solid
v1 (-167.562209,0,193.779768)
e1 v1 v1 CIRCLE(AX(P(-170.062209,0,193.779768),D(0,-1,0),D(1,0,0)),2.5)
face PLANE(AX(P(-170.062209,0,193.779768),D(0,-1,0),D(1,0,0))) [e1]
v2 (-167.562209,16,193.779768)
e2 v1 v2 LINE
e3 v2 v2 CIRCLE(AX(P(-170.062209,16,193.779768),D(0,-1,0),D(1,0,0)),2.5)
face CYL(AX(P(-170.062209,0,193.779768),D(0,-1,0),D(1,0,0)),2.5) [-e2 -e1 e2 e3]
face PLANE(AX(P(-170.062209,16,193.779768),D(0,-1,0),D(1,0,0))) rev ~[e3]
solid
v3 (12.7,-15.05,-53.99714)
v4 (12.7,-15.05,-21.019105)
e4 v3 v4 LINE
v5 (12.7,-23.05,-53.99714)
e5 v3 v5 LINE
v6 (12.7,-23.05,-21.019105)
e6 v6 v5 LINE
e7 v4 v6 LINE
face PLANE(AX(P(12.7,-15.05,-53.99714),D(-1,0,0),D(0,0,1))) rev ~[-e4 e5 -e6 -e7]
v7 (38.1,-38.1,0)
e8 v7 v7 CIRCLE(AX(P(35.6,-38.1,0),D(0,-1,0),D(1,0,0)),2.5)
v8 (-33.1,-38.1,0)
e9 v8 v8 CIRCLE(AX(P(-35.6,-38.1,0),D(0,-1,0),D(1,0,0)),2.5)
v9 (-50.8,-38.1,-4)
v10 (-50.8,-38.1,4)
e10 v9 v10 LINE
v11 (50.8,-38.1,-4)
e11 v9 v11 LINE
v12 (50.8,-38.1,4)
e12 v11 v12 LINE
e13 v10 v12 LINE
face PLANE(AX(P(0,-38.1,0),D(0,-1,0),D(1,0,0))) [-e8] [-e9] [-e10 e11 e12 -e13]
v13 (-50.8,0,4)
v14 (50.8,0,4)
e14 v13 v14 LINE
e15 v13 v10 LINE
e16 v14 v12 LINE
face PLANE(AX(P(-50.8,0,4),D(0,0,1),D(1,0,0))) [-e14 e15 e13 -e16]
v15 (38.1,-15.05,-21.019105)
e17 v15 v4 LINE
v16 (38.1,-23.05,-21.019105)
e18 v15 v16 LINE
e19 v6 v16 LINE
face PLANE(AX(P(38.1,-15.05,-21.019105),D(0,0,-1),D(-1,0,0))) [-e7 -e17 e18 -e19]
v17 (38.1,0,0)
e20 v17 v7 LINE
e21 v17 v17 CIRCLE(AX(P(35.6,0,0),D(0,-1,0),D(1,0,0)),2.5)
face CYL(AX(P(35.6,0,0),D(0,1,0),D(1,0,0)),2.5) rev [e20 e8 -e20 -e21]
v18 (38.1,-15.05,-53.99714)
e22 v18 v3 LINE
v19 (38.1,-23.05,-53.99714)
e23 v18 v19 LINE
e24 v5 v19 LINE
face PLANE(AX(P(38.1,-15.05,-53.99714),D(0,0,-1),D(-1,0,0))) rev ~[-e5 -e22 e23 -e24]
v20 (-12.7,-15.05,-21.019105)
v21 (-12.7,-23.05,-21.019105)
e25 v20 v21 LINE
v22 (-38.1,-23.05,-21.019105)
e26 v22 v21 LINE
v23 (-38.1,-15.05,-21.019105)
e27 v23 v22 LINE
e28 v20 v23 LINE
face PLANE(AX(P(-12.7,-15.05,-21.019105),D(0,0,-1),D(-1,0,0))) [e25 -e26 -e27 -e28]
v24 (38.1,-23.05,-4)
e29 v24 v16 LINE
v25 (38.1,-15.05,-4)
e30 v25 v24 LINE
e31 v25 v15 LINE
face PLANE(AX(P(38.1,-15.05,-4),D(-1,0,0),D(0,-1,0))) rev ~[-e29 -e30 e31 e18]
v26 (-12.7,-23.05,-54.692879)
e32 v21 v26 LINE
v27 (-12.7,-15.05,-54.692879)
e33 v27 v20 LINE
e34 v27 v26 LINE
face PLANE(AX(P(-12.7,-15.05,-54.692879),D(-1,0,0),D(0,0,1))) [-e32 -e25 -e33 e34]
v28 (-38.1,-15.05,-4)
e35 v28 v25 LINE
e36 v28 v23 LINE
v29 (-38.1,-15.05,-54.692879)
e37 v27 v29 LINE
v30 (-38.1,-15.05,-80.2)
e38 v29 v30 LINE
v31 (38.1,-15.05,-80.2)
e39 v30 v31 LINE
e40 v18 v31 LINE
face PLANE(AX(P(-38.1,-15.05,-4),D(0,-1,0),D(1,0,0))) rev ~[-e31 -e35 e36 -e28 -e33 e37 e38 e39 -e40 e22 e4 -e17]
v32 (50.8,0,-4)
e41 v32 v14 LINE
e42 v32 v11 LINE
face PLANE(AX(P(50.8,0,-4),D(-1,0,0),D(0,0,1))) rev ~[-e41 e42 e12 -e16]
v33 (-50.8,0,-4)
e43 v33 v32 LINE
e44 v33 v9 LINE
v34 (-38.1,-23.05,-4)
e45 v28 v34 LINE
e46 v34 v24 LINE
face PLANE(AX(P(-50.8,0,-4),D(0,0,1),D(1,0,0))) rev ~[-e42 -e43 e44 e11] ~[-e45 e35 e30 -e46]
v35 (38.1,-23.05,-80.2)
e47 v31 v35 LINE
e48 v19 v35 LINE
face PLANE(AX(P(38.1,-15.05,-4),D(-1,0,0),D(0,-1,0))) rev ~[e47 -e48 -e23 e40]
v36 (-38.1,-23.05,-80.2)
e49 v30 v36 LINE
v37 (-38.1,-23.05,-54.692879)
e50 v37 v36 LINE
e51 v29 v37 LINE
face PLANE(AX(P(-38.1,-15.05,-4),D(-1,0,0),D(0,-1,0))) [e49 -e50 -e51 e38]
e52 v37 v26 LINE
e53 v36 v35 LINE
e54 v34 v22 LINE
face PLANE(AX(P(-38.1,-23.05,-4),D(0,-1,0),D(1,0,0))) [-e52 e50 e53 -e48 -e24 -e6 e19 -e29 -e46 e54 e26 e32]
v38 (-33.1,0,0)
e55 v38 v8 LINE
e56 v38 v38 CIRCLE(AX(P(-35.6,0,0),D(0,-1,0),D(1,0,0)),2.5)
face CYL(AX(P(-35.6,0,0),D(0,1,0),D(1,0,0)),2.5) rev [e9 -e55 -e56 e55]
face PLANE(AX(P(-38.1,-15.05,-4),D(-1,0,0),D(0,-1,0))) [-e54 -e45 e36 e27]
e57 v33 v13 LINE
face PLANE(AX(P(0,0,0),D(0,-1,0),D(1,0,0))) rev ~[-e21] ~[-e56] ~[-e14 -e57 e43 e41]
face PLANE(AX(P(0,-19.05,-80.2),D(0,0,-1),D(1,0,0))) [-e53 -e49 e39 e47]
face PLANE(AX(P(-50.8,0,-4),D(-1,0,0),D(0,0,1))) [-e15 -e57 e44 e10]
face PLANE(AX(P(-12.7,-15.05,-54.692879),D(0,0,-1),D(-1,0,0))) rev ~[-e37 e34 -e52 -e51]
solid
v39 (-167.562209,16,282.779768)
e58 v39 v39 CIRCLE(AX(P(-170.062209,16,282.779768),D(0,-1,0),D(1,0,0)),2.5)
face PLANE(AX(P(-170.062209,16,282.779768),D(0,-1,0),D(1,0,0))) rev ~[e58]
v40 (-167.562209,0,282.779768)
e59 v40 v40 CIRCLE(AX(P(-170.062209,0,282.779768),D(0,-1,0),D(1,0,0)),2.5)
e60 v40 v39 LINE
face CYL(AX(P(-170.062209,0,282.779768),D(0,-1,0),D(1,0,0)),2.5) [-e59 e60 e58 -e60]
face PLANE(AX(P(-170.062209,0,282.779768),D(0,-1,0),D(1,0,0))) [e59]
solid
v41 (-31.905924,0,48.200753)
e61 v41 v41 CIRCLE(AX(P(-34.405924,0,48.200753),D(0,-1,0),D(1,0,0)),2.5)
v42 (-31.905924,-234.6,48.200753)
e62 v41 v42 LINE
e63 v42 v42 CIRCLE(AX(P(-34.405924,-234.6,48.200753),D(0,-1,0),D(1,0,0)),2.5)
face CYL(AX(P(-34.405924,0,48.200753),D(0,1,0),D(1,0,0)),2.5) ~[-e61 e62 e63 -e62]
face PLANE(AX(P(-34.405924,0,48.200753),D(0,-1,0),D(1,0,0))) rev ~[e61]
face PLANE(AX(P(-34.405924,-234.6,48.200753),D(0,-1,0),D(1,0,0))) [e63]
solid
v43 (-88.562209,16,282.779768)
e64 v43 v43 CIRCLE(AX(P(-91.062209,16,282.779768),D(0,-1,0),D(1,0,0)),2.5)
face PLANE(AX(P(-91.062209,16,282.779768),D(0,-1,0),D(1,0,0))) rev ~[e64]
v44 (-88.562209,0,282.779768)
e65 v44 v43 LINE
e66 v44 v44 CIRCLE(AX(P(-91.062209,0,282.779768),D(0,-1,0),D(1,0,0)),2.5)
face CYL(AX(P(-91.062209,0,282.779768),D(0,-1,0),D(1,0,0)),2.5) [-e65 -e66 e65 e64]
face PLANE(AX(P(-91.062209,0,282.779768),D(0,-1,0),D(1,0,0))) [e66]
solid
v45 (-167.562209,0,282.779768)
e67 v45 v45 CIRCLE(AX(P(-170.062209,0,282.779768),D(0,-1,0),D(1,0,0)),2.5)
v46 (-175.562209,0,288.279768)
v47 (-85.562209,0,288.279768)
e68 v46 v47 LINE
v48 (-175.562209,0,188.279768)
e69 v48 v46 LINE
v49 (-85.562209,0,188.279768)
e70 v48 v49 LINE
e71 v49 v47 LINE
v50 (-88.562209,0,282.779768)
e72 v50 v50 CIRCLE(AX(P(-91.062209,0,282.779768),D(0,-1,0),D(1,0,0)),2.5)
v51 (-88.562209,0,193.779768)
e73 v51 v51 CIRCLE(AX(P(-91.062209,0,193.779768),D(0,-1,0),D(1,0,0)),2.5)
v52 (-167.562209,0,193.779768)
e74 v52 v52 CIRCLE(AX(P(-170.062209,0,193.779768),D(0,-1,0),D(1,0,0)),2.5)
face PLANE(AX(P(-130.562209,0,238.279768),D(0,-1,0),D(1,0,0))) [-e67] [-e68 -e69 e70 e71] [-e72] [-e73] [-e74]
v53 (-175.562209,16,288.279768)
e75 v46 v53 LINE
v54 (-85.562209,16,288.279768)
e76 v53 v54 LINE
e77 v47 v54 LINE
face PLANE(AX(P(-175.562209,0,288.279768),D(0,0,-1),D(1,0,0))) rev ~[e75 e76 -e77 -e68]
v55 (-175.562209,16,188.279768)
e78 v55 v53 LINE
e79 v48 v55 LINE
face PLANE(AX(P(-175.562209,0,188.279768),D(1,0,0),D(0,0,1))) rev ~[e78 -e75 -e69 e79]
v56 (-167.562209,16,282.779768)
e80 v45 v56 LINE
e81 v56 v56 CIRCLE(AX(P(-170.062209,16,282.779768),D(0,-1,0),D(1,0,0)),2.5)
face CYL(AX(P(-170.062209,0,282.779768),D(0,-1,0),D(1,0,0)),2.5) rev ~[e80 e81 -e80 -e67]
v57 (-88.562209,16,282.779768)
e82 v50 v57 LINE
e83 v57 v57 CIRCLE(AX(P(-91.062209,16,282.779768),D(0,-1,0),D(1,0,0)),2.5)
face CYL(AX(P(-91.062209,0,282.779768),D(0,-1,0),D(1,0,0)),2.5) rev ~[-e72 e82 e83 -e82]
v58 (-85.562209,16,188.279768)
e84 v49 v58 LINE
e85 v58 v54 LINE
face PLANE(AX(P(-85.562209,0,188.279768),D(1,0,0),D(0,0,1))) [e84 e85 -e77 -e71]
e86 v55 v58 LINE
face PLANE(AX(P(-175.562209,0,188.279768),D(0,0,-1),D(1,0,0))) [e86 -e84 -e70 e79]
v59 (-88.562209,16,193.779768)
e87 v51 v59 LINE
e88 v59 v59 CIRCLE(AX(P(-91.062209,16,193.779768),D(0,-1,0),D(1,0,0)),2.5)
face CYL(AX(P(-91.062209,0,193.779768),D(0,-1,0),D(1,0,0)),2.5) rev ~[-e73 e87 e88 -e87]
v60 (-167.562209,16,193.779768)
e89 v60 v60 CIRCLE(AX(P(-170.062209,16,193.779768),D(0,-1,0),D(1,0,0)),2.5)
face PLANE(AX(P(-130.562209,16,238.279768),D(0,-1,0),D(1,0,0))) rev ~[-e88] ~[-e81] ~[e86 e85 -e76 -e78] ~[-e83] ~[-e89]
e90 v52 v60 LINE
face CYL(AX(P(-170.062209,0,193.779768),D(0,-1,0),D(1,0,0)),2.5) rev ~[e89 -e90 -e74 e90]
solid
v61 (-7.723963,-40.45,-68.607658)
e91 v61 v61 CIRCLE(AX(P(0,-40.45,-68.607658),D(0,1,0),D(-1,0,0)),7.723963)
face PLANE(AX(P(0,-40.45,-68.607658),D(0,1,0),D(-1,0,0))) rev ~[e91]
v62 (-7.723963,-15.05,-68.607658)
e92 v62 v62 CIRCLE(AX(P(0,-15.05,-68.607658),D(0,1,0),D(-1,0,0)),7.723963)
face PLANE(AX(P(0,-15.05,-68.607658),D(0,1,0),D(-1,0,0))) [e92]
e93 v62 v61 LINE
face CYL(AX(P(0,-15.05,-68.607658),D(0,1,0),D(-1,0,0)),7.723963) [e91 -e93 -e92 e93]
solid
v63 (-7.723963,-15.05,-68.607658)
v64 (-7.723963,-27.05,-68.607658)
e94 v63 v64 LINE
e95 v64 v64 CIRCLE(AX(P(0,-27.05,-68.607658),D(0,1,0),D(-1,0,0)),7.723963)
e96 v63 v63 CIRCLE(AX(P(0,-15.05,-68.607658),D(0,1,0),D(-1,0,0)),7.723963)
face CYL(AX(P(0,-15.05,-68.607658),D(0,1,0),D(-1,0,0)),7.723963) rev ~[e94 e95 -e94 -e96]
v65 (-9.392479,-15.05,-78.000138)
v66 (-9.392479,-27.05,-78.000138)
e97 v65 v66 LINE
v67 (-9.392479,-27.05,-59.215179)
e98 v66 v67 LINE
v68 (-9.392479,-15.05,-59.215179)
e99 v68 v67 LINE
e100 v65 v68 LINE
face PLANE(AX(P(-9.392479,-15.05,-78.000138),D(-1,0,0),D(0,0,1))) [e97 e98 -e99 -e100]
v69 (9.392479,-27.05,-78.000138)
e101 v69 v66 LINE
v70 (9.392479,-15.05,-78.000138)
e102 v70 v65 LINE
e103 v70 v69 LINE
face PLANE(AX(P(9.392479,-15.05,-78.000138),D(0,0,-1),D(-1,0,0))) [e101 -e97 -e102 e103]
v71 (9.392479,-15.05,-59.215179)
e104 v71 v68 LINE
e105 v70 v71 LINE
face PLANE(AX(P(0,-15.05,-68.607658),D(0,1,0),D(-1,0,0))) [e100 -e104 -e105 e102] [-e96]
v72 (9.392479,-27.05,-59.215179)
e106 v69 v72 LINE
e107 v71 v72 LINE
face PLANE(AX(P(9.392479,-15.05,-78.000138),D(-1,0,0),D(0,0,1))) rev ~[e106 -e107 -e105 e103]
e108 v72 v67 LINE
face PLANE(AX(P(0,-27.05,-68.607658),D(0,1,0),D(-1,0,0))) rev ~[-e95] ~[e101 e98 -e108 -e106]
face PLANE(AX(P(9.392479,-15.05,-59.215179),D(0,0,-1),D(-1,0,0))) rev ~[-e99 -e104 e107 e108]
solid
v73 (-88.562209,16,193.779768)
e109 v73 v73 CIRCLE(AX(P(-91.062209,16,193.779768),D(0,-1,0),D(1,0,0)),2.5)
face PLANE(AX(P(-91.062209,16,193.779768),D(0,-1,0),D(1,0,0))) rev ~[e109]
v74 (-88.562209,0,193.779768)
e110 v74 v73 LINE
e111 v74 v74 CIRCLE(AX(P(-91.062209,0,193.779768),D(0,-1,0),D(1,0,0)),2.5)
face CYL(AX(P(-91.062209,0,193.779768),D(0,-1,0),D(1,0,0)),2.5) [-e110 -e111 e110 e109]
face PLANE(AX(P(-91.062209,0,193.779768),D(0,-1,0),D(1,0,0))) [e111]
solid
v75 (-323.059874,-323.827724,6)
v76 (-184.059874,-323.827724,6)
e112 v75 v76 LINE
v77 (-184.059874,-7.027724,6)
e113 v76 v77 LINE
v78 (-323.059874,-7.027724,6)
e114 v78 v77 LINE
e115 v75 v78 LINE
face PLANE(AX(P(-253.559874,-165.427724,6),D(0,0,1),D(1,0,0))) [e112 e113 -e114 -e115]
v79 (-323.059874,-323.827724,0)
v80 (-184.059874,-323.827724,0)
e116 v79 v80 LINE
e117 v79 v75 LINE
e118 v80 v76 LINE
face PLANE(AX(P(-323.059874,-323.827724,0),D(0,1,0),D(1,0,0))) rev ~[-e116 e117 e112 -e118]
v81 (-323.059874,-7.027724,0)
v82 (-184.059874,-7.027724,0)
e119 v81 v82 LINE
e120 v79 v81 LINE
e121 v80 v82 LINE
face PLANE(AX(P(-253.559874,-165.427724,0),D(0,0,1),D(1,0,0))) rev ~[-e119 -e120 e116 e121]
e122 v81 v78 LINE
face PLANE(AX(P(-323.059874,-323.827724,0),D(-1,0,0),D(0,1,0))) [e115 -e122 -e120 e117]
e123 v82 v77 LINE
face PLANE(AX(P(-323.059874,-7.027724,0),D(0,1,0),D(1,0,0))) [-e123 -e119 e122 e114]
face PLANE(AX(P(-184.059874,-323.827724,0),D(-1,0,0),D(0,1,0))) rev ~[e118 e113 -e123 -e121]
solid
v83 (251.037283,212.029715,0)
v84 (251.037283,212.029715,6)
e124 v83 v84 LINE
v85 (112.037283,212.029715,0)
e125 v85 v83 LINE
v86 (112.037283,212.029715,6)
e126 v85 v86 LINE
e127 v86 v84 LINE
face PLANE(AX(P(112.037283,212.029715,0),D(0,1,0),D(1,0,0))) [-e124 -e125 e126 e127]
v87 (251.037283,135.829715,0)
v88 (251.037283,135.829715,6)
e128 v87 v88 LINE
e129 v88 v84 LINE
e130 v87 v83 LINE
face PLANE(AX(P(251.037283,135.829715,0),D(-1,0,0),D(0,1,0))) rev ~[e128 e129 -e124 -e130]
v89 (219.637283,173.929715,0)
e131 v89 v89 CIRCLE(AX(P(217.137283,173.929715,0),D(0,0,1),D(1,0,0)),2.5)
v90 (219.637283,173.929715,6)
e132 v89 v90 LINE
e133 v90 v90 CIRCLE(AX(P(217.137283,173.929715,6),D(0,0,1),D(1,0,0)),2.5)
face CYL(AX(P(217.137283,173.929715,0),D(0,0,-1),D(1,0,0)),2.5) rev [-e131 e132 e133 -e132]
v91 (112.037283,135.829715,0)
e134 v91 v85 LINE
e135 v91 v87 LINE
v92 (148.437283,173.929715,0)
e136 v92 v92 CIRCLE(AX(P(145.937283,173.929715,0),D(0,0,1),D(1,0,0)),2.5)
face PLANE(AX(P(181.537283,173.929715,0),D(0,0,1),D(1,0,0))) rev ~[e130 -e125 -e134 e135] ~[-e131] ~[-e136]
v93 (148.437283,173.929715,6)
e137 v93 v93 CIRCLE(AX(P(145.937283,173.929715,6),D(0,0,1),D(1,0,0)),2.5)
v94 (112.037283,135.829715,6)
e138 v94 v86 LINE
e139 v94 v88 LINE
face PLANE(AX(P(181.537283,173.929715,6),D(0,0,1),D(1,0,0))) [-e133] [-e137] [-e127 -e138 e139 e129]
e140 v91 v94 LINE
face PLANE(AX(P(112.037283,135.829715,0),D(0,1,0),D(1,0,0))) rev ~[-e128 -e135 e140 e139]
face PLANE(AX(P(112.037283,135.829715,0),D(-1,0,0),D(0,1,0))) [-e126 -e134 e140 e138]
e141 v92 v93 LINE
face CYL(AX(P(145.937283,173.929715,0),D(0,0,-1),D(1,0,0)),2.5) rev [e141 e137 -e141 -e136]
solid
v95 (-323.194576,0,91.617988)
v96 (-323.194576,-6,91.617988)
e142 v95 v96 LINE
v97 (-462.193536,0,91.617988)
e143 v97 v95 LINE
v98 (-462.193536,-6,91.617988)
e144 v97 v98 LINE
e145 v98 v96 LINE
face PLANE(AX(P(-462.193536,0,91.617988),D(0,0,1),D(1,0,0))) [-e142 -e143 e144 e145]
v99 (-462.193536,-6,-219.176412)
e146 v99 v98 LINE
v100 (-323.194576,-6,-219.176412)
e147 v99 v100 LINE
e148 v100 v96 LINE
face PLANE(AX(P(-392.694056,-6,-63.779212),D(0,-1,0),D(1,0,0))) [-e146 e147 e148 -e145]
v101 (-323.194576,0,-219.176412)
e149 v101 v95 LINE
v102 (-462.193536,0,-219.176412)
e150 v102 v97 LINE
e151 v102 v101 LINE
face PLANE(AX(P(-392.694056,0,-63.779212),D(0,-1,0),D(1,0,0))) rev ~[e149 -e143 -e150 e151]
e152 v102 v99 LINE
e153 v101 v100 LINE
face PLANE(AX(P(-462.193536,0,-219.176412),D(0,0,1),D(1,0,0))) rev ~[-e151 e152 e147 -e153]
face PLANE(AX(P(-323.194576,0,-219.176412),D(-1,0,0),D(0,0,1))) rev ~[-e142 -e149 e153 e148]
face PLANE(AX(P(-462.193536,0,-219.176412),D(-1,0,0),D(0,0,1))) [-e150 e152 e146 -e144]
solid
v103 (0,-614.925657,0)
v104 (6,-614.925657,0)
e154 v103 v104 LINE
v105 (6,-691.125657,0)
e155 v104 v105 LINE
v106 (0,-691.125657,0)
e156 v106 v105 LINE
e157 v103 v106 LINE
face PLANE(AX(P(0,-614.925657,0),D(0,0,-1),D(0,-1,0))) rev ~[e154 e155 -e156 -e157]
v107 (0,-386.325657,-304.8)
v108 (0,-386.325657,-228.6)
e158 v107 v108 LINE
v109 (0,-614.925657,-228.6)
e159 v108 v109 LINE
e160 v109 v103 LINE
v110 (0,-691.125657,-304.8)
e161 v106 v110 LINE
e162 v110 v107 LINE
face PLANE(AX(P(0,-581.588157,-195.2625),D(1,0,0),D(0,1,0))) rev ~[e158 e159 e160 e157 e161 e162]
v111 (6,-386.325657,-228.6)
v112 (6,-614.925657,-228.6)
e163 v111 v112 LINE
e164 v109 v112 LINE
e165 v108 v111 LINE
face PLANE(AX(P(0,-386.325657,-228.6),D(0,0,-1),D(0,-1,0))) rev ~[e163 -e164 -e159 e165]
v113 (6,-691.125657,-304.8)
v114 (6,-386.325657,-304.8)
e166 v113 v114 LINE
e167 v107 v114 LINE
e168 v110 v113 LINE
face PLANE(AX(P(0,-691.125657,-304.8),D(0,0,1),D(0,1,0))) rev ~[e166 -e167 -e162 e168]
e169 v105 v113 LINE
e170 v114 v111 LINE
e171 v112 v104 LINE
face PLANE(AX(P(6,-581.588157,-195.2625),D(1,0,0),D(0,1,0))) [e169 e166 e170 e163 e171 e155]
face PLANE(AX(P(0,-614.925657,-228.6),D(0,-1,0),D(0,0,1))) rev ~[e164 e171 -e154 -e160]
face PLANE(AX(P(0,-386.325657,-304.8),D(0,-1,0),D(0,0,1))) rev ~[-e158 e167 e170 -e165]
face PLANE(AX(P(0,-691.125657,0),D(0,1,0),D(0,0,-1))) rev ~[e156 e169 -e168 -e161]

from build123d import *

# Parameters (mm, degrees)
F0_W      = 101.6
F0_H      = 8
F0_R      = 2.5
F1_DEPTH  = 38.1
F2_R      = 2.5
F3_DEPTH  = 234.6
F5_DEPTH  = 6
F6_W      = 138.99896
F6_H      = 310.7944
F7_DEPTH  = 6
F8_W      = 139
F8_H      = 316.8
F9_DEPTH  = 6
F10_W     = 139
F10_H     = 76.2
F10_R     = 2.5
F11_DEPTH = 6
F12_W     = 90
F12_H     = 100
F12_R     = 2.5
F13_DEPTH = 16
F14_DEPTH = 16
F15_W     = 76.2
F15_H     = 8
F16_DEPTH = 76.2
F17_W     = 25.4
F17_H     = 32.9780355096
F17_H_2   = 33.673774451
F18_DEPTH = 676.0766565222
F17_W_2   = 18.7849588692
F17_H_3   = 18.7849588692
F17_R     = 7.7239634119
F19_DEPTH = 12
F17_R_2   = 5.4539048991
F20_DEPTH = 25.4


# Not quite as in the source:
# - a feature of the source that left no trace in its solid (it failed there, or was rolled back) is left out


with BuildPart() as f1:
    # F0 (on Front) → F1 (new body)
    with BuildSketch(Plane.XZ):
        Rectangle(F0_W, F0_H)
        with Locations((-35.6, 0)):
            Circle(F0_R, mode=Mode.SUBTRACT)
        with Locations((35.6, 0)):
            Circle(F0_R, mode=Mode.SUBTRACT)
    extrude(amount=F1_DEPTH)

    # F15 (on face) → F16 (join)
    with BuildSketch(Plane(origin=(0, 0, -4), x_dir=(1, 0, 0), z_dir=(0, 0, -1))):
        with Locations((0, 19.05)):
            Rectangle(F15_W, F15_H)
    extrude(amount=F16_DEPTH)

    # F17 (on face) → F18 (cut, through all)
    with BuildSketch(Plane(origin=(0, -15.05, 0), x_dir=(-1, 0, 0), z_dir=(0, 1, 0))):
        with Locations((-25.4, -37.508122623)):
            Rectangle(F17_W, F17_H)
        with Locations((25.4, -37.8559920937)):
            Rectangle(F17_W, F17_H_2)
    extrude(amount=-F18_DEPTH, mode=Mode.SUBTRACT)


with BuildPart() as f3:
    # F2 (on Front) → F3 (new body)
    with BuildSketch(Plane.XZ):
        with Locations((-34.4059243798, 48.2007525861)):
            Circle(F2_R)
    extrude(amount=F3_DEPTH)


with BuildPart() as f5:
    # F4 (on Right) → F5 (new body)
    with BuildSketch(Plane.YZ):
        Polygon((-614.9256565222, -228.6), (-614.9256565222, 0), (-691.1256565222, 0), (-691.1256565222, -304.8), (-386.3256565222, -304.8), (-386.3256565222, -228.6), align=None)
    extrude(amount=F5_DEPTH)


with BuildPart() as f7:
    # F6 (on Front) → F7 (new body)
    with BuildSketch(Plane.XZ):
        with Locations((-392.6940560341, -63.7792117634)):
            Rectangle(F6_W, F6_H)
    extrude(amount=F7_DEPTH)


with BuildPart() as f9:
    # F8 (on Top) → F9 (new body)
    with BuildSketch(Plane.XY):
        with Locations((-253.5598740487, -165.4277235146)):
            Rectangle(F8_W, F8_H)
    extrude(amount=F9_DEPTH)


with BuildPart() as f11:
    # F10 (on Top) → F11 (new body)
    with BuildSketch(Plane.XY):
        with Locations((181.5372826105, 173.9297149658)):
            Rectangle(F10_W, F10_H)
        with Locations((145.9372826105, 173.9297149658)):
            Circle(F10_R, mode=Mode.SUBTRACT)
        with Locations((217.1372826105, 173.9297149658)):
            Circle(F10_R, mode=Mode.SUBTRACT)
    extrude(amount=F11_DEPTH)


with BuildPart() as f13:
    # F12 (on Front) → F13 (new body)
    with BuildSketch(Plane.XZ):
        with Locations((-130.562209487, 238.2797680418)):
            Rectangle(F12_W, F12_H)
        with Locations((-170.062209487, 193.7797680418)):
            Circle(F12_R, mode=Mode.SUBTRACT)
        with Locations((-91.062209487, 193.7797680418)):
            Circle(F12_R, mode=Mode.SUBTRACT)
        with Locations((-170.062209487, 282.7797680418)):
            Circle(F12_R, mode=Mode.SUBTRACT)
        with Locations((-91.062209487, 282.7797680418)):
            Circle(F12_R, mode=Mode.SUBTRACT)
    extrude(amount=-F13_DEPTH)


with BuildPart() as f14:
    # F12 (on Front) → F14 (new body)
    with BuildSketch(Plane.XZ):
        with Locations((-170.062209487, 282.7797680418)):
            Circle(F12_R)
    extrude(amount=-F14_DEPTH)


with BuildPart() as f14b:
    # F12 (on Front) → F14, piece 2 (new body)
    with BuildSketch(Plane.XZ):
        with Locations((-91.062209487, 282.7797680418)):
            Circle(F12_R)
    extrude(amount=-F14_DEPTH)


with BuildPart() as f14c:
    # F12 (on Front) → F14, piece 3 (new body)
    with BuildSketch(Plane.XZ):
        with Locations((-91.062209487, 193.7797680418)):
            Circle(F12_R)
    extrude(amount=-F14_DEPTH)


with BuildPart() as f14d:
    # F12 (on Front) → F14, piece 4 (new body)
    with BuildSketch(Plane.XZ):
        with Locations((-170.062209487, 193.7797680418)):
            Circle(F12_R)
    extrude(amount=-F14_DEPTH)


with BuildPart() as f19:
    # F17 (on face) → F19 (new body)
    with BuildSketch(Plane(origin=(0, -15.05, 0), x_dir=(-1, 0, 0), z_dir=(0, 1, 0))):
        with Locations((0, -68.6076581478)):
            Rectangle(F17_W_2, F17_H_3)
        with Locations((0, -68.6076581478)):
            Circle(F17_R, mode=Mode.SUBTRACT)
    extrude(amount=-F19_DEPTH)


with BuildPart() as f20:
    # F17 (on face) → F20 (new body)
    with BuildSketch(Plane(origin=(0, -15.05, 0), x_dir=(-1, 0, 0), z_dir=(0, 1, 0))):
        with Locations((0, -68.6076581478)):
            Circle(F17_R)
        with Locations((0, -68.6076581478)):
            Circle(F17_R_2, mode=Mode.SUBTRACT)
        with Locations((0, -68.6076581478)):
            Circle(F17_R_2)
    extrude(amount=-F20_DEPTH)


solid = Compound([f1.part, f3.part, f5.part, f7.part, f9.part, f11.part, f13.part, f14.part, f14b.part, f14c.part, f14d.part, f19.part, f20.part])
